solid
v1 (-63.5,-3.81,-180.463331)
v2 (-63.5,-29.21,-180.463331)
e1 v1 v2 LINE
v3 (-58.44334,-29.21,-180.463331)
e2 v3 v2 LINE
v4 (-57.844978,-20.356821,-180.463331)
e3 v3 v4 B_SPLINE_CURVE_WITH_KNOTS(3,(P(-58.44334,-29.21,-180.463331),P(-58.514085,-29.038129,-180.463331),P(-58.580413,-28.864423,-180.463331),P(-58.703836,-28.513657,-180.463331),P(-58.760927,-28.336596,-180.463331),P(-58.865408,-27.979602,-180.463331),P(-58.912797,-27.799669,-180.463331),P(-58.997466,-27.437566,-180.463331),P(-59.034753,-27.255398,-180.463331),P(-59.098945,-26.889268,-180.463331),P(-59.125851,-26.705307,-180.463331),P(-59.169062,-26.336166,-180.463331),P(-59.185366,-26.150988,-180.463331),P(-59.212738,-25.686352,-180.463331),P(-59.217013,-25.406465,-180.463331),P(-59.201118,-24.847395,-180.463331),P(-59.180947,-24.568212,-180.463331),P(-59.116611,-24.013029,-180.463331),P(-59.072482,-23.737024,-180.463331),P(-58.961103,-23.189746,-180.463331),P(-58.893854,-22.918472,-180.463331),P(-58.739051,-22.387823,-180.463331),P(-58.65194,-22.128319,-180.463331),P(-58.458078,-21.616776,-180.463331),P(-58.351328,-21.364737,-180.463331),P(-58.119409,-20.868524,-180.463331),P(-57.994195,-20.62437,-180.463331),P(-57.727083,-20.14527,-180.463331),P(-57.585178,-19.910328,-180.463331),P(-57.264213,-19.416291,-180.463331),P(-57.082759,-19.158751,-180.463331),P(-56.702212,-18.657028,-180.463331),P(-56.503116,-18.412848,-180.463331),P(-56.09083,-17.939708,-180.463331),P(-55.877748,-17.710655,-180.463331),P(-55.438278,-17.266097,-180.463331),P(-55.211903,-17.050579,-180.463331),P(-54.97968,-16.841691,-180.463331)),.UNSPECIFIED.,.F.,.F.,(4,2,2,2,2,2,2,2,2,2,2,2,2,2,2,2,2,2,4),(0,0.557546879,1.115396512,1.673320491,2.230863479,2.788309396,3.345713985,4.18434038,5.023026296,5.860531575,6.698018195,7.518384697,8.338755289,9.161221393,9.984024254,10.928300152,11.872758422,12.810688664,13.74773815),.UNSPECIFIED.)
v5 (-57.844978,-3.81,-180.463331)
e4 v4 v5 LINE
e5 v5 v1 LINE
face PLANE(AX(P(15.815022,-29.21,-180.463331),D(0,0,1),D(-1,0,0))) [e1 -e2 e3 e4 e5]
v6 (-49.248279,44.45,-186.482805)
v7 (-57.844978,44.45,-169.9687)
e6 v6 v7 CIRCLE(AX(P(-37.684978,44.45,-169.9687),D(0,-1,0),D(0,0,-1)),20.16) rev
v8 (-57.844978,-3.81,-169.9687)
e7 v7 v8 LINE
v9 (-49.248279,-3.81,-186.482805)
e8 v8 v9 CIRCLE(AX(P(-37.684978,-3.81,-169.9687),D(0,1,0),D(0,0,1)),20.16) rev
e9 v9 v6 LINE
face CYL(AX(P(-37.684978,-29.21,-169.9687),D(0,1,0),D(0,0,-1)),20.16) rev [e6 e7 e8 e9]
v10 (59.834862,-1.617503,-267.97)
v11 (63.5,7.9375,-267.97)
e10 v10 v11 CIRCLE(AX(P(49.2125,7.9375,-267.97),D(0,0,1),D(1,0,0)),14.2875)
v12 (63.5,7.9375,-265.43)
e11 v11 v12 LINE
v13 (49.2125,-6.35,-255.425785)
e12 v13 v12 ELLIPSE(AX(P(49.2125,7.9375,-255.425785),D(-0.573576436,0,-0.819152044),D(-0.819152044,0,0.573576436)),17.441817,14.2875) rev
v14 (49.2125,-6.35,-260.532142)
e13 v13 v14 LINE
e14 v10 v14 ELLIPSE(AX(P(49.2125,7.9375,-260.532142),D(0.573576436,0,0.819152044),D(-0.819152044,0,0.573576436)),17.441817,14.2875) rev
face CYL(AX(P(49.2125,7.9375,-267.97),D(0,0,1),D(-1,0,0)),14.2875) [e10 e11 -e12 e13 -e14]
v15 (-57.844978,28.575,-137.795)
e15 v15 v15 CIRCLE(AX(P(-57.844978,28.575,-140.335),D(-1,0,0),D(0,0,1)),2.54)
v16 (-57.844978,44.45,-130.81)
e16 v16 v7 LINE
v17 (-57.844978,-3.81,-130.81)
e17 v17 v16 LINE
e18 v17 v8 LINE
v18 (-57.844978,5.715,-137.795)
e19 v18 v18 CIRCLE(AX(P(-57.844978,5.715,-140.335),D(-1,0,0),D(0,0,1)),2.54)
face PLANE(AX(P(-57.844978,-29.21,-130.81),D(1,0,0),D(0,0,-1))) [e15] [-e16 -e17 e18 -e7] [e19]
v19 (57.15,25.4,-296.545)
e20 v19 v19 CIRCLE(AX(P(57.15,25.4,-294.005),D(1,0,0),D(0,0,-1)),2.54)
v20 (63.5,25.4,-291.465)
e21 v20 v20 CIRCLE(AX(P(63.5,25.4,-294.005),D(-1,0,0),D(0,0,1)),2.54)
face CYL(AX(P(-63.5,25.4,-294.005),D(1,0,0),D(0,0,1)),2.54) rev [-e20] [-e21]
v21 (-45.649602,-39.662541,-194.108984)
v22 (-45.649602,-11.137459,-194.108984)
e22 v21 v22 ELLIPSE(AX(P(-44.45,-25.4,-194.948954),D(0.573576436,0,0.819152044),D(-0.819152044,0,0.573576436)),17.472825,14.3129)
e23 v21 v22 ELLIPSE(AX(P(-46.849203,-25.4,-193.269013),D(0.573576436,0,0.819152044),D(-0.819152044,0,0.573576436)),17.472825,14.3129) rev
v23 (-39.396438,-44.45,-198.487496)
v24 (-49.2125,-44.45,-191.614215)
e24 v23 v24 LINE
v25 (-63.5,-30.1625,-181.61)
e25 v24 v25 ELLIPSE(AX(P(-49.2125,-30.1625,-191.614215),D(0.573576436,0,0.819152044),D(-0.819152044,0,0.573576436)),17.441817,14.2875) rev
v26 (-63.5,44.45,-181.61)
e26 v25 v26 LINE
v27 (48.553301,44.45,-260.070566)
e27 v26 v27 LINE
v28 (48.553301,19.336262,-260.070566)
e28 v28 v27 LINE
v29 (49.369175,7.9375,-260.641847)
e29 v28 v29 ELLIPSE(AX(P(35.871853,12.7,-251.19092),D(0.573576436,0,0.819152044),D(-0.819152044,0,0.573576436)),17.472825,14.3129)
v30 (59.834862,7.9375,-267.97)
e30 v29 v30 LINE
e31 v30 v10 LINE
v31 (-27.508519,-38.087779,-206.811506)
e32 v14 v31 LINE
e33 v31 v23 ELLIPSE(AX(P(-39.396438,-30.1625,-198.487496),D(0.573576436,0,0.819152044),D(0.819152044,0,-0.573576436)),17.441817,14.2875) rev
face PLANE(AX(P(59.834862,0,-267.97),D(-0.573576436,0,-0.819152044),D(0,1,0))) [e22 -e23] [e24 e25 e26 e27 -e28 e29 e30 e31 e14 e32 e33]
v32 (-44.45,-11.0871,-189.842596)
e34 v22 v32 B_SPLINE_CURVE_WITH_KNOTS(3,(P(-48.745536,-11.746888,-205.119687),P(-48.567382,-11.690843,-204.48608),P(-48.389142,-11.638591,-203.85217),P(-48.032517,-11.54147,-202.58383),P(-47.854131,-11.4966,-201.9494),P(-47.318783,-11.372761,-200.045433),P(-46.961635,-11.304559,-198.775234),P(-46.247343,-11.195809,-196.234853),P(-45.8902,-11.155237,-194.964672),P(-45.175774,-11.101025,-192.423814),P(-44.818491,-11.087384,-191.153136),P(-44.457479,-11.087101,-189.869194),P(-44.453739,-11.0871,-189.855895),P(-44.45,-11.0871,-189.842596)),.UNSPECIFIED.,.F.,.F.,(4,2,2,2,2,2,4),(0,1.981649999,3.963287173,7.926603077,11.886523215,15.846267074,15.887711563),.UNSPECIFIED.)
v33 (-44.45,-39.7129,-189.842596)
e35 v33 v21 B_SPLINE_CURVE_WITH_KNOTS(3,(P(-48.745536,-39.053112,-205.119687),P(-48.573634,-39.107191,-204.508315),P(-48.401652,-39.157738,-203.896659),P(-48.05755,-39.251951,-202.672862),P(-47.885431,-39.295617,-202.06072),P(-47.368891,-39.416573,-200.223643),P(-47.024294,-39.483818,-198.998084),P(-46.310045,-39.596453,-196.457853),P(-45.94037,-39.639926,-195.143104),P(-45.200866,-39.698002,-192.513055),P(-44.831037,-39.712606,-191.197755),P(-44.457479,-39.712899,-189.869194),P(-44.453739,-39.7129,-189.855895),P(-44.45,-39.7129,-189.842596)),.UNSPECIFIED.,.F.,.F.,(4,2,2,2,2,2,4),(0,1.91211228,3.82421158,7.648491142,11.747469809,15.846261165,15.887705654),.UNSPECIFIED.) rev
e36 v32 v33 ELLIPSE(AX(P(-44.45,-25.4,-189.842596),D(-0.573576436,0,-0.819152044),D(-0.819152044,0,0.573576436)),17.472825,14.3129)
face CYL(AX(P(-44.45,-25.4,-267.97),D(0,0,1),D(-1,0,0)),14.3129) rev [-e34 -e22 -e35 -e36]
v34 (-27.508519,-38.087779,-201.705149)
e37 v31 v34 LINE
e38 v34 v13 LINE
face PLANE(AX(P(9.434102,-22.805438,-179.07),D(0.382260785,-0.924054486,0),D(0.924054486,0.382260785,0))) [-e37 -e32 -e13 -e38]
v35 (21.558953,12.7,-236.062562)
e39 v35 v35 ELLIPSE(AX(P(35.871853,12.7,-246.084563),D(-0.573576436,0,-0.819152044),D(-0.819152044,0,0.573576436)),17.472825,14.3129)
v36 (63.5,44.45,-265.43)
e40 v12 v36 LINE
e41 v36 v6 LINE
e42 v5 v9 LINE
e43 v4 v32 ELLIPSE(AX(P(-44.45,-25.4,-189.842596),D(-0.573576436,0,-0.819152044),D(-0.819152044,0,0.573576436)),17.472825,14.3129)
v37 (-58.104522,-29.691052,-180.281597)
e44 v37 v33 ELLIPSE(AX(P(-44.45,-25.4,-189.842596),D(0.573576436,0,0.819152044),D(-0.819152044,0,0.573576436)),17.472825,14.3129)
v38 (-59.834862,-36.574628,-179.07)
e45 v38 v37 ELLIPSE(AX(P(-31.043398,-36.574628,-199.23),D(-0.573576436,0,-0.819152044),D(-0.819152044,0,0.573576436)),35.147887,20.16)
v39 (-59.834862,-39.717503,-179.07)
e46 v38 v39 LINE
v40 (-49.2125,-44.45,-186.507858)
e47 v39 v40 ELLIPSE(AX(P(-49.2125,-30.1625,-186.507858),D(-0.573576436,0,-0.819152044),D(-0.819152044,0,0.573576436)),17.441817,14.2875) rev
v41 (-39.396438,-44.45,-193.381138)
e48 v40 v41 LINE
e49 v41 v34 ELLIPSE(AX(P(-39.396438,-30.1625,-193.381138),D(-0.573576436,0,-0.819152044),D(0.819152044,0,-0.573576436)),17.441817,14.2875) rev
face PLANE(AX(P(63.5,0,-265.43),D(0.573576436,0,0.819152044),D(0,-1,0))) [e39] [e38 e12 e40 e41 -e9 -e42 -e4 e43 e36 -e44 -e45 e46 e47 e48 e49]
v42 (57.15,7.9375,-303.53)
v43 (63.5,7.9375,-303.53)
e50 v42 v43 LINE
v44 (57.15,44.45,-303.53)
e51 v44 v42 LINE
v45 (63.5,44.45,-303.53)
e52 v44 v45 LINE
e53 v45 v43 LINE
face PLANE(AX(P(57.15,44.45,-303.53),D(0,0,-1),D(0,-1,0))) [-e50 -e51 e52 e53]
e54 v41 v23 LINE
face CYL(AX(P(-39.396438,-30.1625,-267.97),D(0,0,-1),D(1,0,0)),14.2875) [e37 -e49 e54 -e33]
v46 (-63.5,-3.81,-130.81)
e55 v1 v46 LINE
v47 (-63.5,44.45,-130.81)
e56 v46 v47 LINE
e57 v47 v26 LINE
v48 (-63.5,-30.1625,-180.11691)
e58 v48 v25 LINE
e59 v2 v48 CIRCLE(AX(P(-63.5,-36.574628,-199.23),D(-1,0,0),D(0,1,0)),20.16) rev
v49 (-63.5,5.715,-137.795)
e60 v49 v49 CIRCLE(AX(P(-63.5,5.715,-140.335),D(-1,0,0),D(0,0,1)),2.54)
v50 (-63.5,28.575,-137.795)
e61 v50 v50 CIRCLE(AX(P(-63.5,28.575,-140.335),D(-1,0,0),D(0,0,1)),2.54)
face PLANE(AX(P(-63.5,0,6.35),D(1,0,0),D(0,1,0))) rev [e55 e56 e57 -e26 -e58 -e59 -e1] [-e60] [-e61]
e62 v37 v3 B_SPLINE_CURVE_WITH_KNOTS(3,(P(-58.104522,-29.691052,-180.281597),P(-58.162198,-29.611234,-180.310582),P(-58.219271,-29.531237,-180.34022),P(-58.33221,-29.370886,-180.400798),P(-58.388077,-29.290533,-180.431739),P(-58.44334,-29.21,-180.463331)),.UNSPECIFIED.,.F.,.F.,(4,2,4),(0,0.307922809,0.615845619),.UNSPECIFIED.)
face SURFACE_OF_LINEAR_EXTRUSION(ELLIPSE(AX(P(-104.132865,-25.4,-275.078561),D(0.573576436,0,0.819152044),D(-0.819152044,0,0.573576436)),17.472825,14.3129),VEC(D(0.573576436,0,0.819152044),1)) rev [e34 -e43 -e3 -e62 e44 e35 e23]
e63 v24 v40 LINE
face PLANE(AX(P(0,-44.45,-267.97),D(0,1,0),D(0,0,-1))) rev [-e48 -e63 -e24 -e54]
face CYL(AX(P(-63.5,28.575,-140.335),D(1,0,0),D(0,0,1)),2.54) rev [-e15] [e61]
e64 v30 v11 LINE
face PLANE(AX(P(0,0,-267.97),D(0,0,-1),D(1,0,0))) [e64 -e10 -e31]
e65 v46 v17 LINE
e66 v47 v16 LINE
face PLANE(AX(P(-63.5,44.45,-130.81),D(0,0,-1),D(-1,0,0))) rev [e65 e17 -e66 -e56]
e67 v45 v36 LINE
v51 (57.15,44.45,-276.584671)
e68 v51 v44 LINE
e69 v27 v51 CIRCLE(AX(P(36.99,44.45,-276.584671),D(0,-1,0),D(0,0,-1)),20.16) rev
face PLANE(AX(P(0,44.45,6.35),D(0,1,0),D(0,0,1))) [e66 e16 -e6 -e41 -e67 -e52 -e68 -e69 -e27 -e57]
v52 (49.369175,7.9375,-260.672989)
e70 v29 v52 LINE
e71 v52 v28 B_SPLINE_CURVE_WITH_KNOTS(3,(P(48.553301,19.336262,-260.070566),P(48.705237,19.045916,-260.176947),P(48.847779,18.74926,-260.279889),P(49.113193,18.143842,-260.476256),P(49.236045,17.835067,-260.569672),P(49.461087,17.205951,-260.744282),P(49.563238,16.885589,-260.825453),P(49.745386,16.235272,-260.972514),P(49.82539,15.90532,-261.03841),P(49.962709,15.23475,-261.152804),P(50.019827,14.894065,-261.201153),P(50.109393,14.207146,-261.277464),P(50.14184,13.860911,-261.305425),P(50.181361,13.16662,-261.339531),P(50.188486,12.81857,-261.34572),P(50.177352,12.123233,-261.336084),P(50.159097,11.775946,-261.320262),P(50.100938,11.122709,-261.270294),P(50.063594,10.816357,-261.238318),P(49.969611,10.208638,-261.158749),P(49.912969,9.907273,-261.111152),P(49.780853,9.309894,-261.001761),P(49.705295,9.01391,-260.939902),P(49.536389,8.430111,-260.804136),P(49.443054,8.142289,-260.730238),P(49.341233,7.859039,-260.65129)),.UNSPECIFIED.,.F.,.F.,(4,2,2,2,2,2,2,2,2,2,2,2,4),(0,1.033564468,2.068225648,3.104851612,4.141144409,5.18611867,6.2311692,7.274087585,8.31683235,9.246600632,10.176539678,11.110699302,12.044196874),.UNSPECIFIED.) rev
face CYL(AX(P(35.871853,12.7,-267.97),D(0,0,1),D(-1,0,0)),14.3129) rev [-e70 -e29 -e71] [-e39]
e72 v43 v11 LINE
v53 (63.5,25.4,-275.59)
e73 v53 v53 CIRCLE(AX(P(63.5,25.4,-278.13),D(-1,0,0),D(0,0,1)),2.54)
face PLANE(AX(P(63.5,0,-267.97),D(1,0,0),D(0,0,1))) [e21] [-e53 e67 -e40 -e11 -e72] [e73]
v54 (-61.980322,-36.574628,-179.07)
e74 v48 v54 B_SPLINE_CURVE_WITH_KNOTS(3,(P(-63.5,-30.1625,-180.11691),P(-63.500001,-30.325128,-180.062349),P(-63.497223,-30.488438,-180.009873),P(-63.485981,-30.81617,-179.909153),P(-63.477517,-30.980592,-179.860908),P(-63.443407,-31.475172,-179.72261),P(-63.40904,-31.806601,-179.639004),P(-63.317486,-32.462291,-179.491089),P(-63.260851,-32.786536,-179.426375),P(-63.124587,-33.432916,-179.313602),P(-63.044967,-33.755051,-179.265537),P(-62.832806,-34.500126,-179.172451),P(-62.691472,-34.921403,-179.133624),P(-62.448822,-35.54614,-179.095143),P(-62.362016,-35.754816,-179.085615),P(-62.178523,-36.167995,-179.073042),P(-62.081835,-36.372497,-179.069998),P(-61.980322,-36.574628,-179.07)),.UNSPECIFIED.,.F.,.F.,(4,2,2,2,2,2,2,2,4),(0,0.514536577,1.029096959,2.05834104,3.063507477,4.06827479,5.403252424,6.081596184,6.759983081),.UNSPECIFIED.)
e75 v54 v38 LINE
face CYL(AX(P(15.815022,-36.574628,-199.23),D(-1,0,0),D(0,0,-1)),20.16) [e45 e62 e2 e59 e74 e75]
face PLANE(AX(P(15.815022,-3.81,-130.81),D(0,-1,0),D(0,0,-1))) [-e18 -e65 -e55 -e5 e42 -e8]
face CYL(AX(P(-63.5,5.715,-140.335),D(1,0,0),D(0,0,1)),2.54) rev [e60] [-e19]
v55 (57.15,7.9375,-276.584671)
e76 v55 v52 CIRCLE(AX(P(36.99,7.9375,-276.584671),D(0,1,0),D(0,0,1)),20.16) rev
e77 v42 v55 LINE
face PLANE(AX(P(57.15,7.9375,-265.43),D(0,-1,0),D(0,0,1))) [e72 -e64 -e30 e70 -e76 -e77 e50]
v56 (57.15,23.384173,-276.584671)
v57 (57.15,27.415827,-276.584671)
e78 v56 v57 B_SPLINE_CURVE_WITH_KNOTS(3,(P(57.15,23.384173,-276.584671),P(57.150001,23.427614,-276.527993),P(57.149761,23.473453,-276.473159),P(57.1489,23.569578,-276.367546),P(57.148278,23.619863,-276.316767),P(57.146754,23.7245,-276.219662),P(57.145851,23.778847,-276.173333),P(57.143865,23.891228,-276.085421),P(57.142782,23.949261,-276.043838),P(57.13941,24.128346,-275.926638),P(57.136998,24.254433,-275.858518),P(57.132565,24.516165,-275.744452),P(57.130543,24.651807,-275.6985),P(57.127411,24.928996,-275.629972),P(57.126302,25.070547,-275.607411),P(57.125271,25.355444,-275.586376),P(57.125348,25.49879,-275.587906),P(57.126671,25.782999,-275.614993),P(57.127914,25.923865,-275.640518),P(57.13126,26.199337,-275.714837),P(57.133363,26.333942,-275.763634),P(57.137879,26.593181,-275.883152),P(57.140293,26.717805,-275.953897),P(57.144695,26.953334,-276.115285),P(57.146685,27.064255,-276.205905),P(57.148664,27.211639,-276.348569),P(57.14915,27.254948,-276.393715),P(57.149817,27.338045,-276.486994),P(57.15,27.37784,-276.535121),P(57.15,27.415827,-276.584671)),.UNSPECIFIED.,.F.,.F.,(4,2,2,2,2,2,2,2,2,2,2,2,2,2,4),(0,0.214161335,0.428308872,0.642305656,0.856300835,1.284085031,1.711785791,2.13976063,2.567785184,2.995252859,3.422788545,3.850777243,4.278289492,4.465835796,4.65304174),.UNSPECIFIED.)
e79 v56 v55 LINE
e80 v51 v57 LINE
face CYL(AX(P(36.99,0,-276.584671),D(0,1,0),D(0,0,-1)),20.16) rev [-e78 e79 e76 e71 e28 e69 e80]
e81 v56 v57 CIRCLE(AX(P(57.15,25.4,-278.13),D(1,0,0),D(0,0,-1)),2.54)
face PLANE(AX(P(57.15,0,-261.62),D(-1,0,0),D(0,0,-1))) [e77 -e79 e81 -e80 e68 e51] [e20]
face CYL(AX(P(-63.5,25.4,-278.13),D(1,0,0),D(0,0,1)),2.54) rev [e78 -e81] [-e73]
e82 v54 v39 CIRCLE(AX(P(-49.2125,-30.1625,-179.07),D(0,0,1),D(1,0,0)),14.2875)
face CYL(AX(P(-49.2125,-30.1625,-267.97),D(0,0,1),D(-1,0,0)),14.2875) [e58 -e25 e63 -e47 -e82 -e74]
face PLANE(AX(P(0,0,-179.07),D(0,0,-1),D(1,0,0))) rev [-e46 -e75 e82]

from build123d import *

# Parameters (mm, degrees)
SKETCH1_R                = 14.312899999999999
BOSS_EXTRUDE1_DEPTH      = 6.35
FILLET1_R                = 14.2875
SKETCH2_W                = 63.5
SKETCH2_H                = 38.099999999999994
BOSS_EXTRUDE2_DEPTH      = 6.35
FILLET2_R                = 14.2875
SKETCH5_W                = 80.56082205671558
SKETCH5_H                = 59.96207335790194
CUT_EXTRUDE3_DEPTH       = 105.34114720473416
SKETCH6_R                = 14.312899999999999
BOSS_EXTRUDE3_DEPTH      = 88.89999999999999
CHAMFER1_SIZE            = 123.334861862
CHAMFER1_SIZE_2          = 86.36
CHAMFER2_START           = -41.62371919
CHAMFER2_OUTLINE_W       = 158.00000000000003
CHAMFER2_OUTLINE_H       = 88.9
CHAMFER2_DEPTH           = 70.741970545
BOSS_EXTRUDE4_DEPTH      = 6.35
BOSS_EXTRUDE5_DEPTH      = 73.65999999999998
CUT_EXTRUDE9_DEPTH       = 140.7047508401556
CUT_EXTRUDE9_DEPTH_BACK  = 140.7047508401556
CUT_EXTRUDE10_DEPTH      = 73.65999999999998
CUT_EXTRUDE10_DEPTH_BACK = 184.87947802715968
FILLET3_R                = 20.16
SKETCH19_R               = 2.539999999999996
CUT_EXTRUDE11_DEPTH      = 184.87947795602068
SKETCH20_R               = 2.5400000000000027
SKETCH20_R_2             = 2.540000000000001
CUT_EXTRUDE12_DEPTH      = 188.65942191717963
FILLET4_R                = 20.16
CUT_EXTRUDE13_DEPTH      = 330.8952367610784
CUT_EXTRUDE13_DEPTH_BACK = 330.8952367610784
SKETCH21_W               = 304.0212933781311
SKETCH21_H               = 127.80861110845143


with BuildPart() as part:
    # Sketch1 → Boss-Extrude1 (new body)
    with BuildSketch(Plane.XY):
        Polygon((-6.34999999999998, -6.349999999999993), (63.500000000000014, -6.349999999999988), (63.50000000000003, 44.44999999999999), (-63.49999999999997, 44.44999999999999), (-63.49999999999994, -44.45), (-31.749999999999943, -44.45), align=None)
        with Locations((-44.44999999999997, -25.400000000000006)):
            Circle(SKETCH1_R, mode=Mode.SUBTRACT)
        with Locations((35.87185256827684, 12.70000000000001)):
            Circle(SKETCH1_R, mode=Mode.SUBTRACT)
    extrude(amount=BOSS_EXTRUDE1_DEPTH)

    # Fillet1
    fillet1_edges = [part.edges().sort_by_distance(p)[0] for p in [
        (-31.749999999999943, -44.45, 3.175),
        (-63.49999999999994, -44.45, 3.175),
        (63.50000000000002, -6.349999999999987, 3.175),
        (-6.349999999999981, -6.349999999999993, 3.175),
    ]]
    fillet(fillet1_edges, radius=FILLET1_R)

    # Sketch2 → Boss-Extrude2 (add)
    with BuildSketch(Plane.XY.offset(6.35)):
        with Locations((2.842e-14, 63.499999999999986)):
            Rectangle(SKETCH2_W, SKETCH2_H)
    extrude(amount=-BOSS_EXTRUDE2_DEPTH)

    # Fillet2
    fillet2_edges = [part.edges().sort_by_distance(p)[0] for p in [
        (-31.74999999999997, 82.54999999999998, 3.175),
        (31.75000000000003, 82.54999999999998, 3.175),
        (31.75000000000003, 44.44999999999999, 3.175),
    ]]
    fillet(fillet2_edges, radius=FILLET2_R)

    # Sketch5 → Cut-Extrude3 (cut, through all)
    with BuildSketch(Plane.XY.offset(6.35)):
        with Locations((8.530411028357818, 74.43103667895096)):
            Rectangle(SKETCH5_W, SKETCH5_H)
    extrude(amount=-CUT_EXTRUDE3_DEPTH, mode=Mode.SUBTRACT)

    # Sketch6 → Boss-Extrude3 (add)
    # profile 1 of 2: a face of its own
    with BuildSketch(Plane.XY.offset(6.35)):
        with BuildLine():
            Line((-27.50851936904525, -38.08777905356794), (49.21250000000003, -6.349999999999989))
            Line((49.21250000000003, -6.349999999999989), (1.296437949397273, -6.3499999999999925))
            ThreePointArc((1.296437949397273, -6.3499999999999925), (-5.445232161641531, -8.040574170103001), (-10.591480630954672, -12.71222094643204))
            Line((-10.591480630954672, -12.71222094643204), (-27.50851936904525, -38.08777905356794))
        make_face()
    # profile 2 of 2: a face of its own
    with BuildSketch(Plane.XY.offset(6.35)):
        with BuildLine():
            ThreePointArc((49.21250000000003, -6.349999999999989), (59.315288136202824, -2.1652881362027863), (63.50000000000003, 7.937500000000011))
            Line((63.50000000000003, 7.937500000000011), (63.50000000000003, 44.44999999999999))
            Line((63.50000000000003, 44.44999999999999), (-63.49999999999997, 44.44999999999999))
            Line((-63.49999999999997, 44.44999999999999), (-63.49999999999994, -30.162500000000005))
            ThreePointArc((-63.49999999999994, -30.162500000000005), (-59.31528813620274, -40.2652881362028), (-49.21249999999995, -44.45))
            Line((-49.21249999999995, -44.45), (-39.396437949397196, -44.45))
            ThreePointArc((-39.396437949397196, -44.45), (-32.65476783835839, -42.759425829897), (-27.50851936904525, -38.08777905356794))
            Line((-27.50851936904525, -38.08777905356794), (-10.591480630954672, -12.71222094643204))
            ThreePointArc((-10.591480630954672, -12.71222094643204), (-5.445232161641531, -8.040574170103001), (1.296437949397273, -6.3499999999999925))
            Line((1.296437949397273, -6.3499999999999925), (49.21250000000003, -6.349999999999989))
        make_face()
        with Locations((35.87185256827684, 12.70000000000001)):
            Circle(SKETCH6_R, mode=Mode.SUBTRACT)
        with Locations((-44.44999999999997, -25.400000000000006)):
            Circle(SKETCH6_R, mode=Mode.SUBTRACT)
    extrude(amount=-BOSS_EXTRUDE3_DEPTH)

    # Chamfer1
    # the kernel refuses this chamfer: 123.334861862, 86.36 mm, written as the material it takes off along each edge
    with BuildSketch(Plane(origin=(63.50000000000003, -310.58122257411287, -82.55), x_dir=(-1, 0, 0), z_dir=(0, 1, 0))) as chamfer1_piece_1:
        Polygon((CHAMFER1_SIZE, 0), (0, CHAMFER1_SIZE_2), (0, 0), align=None)
    extrude(amount=673.5499451482258, mode=Mode.SUBTRACT)

    # Chamfer2: read off the stored shape, not the designer's step
    # Chamfer2 outline → Chamfer2 (cut)
    with BuildSketch(Plane(origin=(0, 0, 0), x_dir=(0.819152044288991, 0, 0.5735764363510472), z_dir=(0.5735764363510472, 0, -0.8191520442889911)).offset(CHAMFER2_START)):
        with Locations((-22.000000000000004, 0)):
            Rectangle(CHAMFER2_OUTLINE_W, CHAMFER2_OUTLINE_H)
    extrude(amount=CHAMFER2_DEPTH, mode=Mode.SUBTRACT)

    # Sketch8 → Boss-Extrude4 (add)
    with BuildSketch(Plane(origin=(63.50000000000003, 0, 0), x_dir=(0, 0, -1), z_dir=(1, 0, 0))):
        Polygon((-3.8100000000002296, 44.44999999999999), (-41.91000000000023, 44.44999999999998), (-41.910000000000224, 7.937500000000005), (-3.8100000000002257, 7.937500000000011), align=None)
    extrude(amount=-BOSS_EXTRUDE4_DEPTH)

    # Sketch10 → Boss-Extrude5 (add)
    with BuildSketch(Plane(origin=(0, 44.44999999999999, 0), x_dir=(1, 0, 0), z_dir=(0, 1, 0))):
        Polygon((-57.84497848897024, 130.81000000000014), (-63.49999999999997, 130.81000000000014), (-63.49999999999997, 80.01000000000018), (-57.844978488970234, 80.01000000000016), align=None)
    extrude(amount=-BOSS_EXTRUDE5_DEPTH)

    # Sketch17 → Cut-Extrude9 (cut, two sides: drawn at the far end of the back side and taken through both)
    with BuildSketch(Plane(origin=(19.10074600681286, 0, -27.278692336917096), x_dir=(-0.8191520442889909, 0, -0.5735764363510474), z_dir=(0.5735764363510474, 0, -0.8191520442889909)).offset(-CUT_EXTRUDE9_DEPTH_BACK)):
        with BuildLine():
            add(Edge.make_bspline(
                [(94.42353448054058, -29.21), (95.93788750756819, -24.718047698019056), (93.93338517829203, -20.356820676396385)],
                knots=[2.872150837356143, 2.872150837356143, 2.872150837356143, 3.5016757767347815, 3.5016757767347815, 3.5016757767347815], degree=2, weights=[1, 0.9508699428937519, 1]))
            add(Edge.make_bspline(
                [(93.93338517829203, -20.356820676396385), (88.79622683458668, -9.179825042266891), (74.45226902252679, -11.318450120374129), (60.108311210466894, -13.457075198481366), (60.108311210466894, -25.4)],
                knots=[3.5016757767347815, 3.5016757767347815, 3.5016757767347815, 4.892430541957184, 4.892430541957184, 6.283185307179586, 6.283185307179586, 6.283185307179586], degree=2, weights=[1, 0.7678119767762641, 1, 0.7678119767762641, 1]))
            add(Edge.make_bspline(
                [(60.108311210466894, -25.400000000000002), (60.108311210466894, -37.903779229296156), (75.2342951684929, -39.58320874739981), (90.36027912651893, -41.262638265503455), (94.42353448054058, -29.21)],
                knots=[0, 0, 0, 1.4360754186780715, 1.4360754186780715, 2.872150837356143, 2.872150837356143, 2.872150837356143], degree=2, weights=[1, 0.7530981852489751, 1, 0.7530981852489751, 1]))
        make_face()
    extrude(amount=CUT_EXTRUDE9_DEPTH + CUT_EXTRUDE9_DEPTH_BACK, mode=Mode.SUBTRACT)

    # Sketch18 → Cut-Extrude10 (cut, two sides: drawn at the far end of the back side and taken through both)
    with BuildSketch(Plane(origin=(-57.84497848897023, 0, 7.9e-15), x_dir=(-1.4e-16, 0, -1), z_dir=(1, 0, -1.4e-16)).offset(-CUT_EXTRUDE10_DEPTH_BACK)):
        Polygon((130.81000000000014, -29.21), (81.15666866187213, -29.210000000000008), (81.15666866187213, -3.8100000000000076), (130.81000000000014, -3.810000000000001), align=None)
    extrude(amount=CUT_EXTRUDE10_DEPTH + CUT_EXTRUDE10_DEPTH_BACK, mode=Mode.SUBTRACT)

    # Fillet3
    # the kernel refuses this fillet: 20.16 mm, written as the material it adds along each edge
    with BuildSketch(Plane(origin=(57.150000000000034, 44.44999999999999, 4.470039485332174), x_dir=(-0.8191520442889912, 0, -0.5735764363510469), z_dir=(0, -1, 0))) as fillet3_piece_1_section:
        with BuildLine():
            CenterArc((FILLET3_R * 0.520567050552, -FILLET3_R), FILLET3_R, 90.00000000000001, 54.99999999999993)
            Line((-FILLET3_R * 0.298584993737, -FILLET3_R * 0.426423563649), (0, 0))
            Line((0, 0), (FILLET3_R * 0.520567050552, 0))
        make_face()
    fillet3_piece_1 = extrude(amount=36.51249999999998, mode=Mode.PRIVATE)
    fillet3_piece_1 = fillet3_piece_1 - Plane(origin=(35.87185256827684, 12.70000000000001, 4.470039485332174), x_dir=(1, 0, 0), z_dir=(0, 0, 1)) * Cylinder(14.312899999999999, 116, mode=Mode.PRIVATE)
    add(fillet3_piece_1)
    with BuildSketch(Plane(origin=(-57.844978488970234, 44.44999999999999, -81.15666866204359), x_dir=(0.8191520442884476, 0, 0.5735764363518233), z_dir=(0, -1, 0))) as fillet3_piece_2:
        with BuildLine():
            CenterArc((FILLET3_R * 0.520567050551, -FILLET3_R), FILLET3_R, 90.00000000000001, 54.99999999994567)
            Line((-FILLET3_R * 0.298584993737, -FILLET3_R * 0.426423563648), (0, 0))
            Line((0, 0), (FILLET3_R * 0.520567050551, 0))
        make_face()
    extrude(amount=48.25999999999999)

    # Sketch19 → Cut-Extrude11 (cut, through all)
    with BuildSketch(Plane(origin=(-57.84497848897023, 0, 7.9e-15), x_dir=(-1.4e-16, 0, -1), z_dir=(1, 0, -1.4e-16))):
        with Locations((121.28500000000014, 28.57499999999999)):
            Circle(SKETCH19_R)
        with Locations((121.28500000000014, 5.7149999999999945)):
            Circle(SKETCH19_R)
    extrude(amount=-CUT_EXTRUDE11_DEPTH, mode=Mode.SUBTRACT)

    # Sketch20 → Cut-Extrude12 (cut, through all)
    with BuildSketch(Plane(origin=(63.50000000000003, 0, 0), x_dir=(0, 0, -1), z_dir=(1, 0, 0))):
        with Locations((-32.38500000000023, 25.39999999999998)):
            Circle(SKETCH20_R)
        with Locations((-16.510000000000232, 25.399999999999977)):
            Circle(SKETCH20_R_2)
    extrude(amount=-CUT_EXTRUDE12_DEPTH, mode=Mode.SUBTRACT)

    # Fillet4
    # the kernel refuses this fillet: 20.16 mm, written as the material it takes off along each edge
    with BuildSketch(Plane(origin=(-41.42329156376277, -29.209999999999994, -82.55), x_dir=(0, -2.04e-14, 1), z_dir=(-1, 0, 0))) as fillet4_piece_1:
        with BuildLine():
            CenterArc((20.160000000000146, -7.364628119294481), FILLET4_R, 158.57340370727903, 21.426596292722138)
            Line((1.5023e-13, -7.364628119294892), (-0.403199999999848, -7.3646281192949))
            Line((-0.403199999999848, -7.3646281192949), (-0.4031999999999982, -8.22e-15))
            Line((-0.4031999999999982, -8.22e-15), (-8.22e-15, 0.4031999999999982))
            ThreePointArc((-8.22e-15, 0.4031999999999982), (0.6966656690639528, 0.4031999999999982), (1.0179979648904802, 0.14729256238588861))
            Line((1.0179979648904802, 0.14729256238588861), (1.393331338127922, 0))
        make_face()
    extrude(amount=40.48827873447443, mode=Mode.SUBTRACT)

    # Mirror1: part across plane


with BuildPart() as part_1:
    add(part.part)
    add(part.part.mirror(Plane(origin=(-57.84497848897024, -29.21, -130.81000000000014), x_dir=(1, 0, 0), z_dir=(0, 0, -1))))

    # Sketch21 → Cut-Extrude13 (cut, two sides: drawn at the far end of the back side and taken through both)
    with BuildSketch(Plane(origin=(-57.84497848897023, 0, 7.9e-15), x_dir=(-1.4e-16, 0, -1), z_dir=(1, 0, -1.4e-16)).offset(-CUT_EXTRUDE13_DEPTH_BACK)):
        with Locations((-21.20064668906538, -19.454305554225726)):
            Rectangle(SKETCH21_W, SKETCH21_H)
    extrude(amount=CUT_EXTRUDE13_DEPTH + CUT_EXTRUDE13_DEPTH_BACK, mode=Mode.SUBTRACT)


solid = part_1.part
